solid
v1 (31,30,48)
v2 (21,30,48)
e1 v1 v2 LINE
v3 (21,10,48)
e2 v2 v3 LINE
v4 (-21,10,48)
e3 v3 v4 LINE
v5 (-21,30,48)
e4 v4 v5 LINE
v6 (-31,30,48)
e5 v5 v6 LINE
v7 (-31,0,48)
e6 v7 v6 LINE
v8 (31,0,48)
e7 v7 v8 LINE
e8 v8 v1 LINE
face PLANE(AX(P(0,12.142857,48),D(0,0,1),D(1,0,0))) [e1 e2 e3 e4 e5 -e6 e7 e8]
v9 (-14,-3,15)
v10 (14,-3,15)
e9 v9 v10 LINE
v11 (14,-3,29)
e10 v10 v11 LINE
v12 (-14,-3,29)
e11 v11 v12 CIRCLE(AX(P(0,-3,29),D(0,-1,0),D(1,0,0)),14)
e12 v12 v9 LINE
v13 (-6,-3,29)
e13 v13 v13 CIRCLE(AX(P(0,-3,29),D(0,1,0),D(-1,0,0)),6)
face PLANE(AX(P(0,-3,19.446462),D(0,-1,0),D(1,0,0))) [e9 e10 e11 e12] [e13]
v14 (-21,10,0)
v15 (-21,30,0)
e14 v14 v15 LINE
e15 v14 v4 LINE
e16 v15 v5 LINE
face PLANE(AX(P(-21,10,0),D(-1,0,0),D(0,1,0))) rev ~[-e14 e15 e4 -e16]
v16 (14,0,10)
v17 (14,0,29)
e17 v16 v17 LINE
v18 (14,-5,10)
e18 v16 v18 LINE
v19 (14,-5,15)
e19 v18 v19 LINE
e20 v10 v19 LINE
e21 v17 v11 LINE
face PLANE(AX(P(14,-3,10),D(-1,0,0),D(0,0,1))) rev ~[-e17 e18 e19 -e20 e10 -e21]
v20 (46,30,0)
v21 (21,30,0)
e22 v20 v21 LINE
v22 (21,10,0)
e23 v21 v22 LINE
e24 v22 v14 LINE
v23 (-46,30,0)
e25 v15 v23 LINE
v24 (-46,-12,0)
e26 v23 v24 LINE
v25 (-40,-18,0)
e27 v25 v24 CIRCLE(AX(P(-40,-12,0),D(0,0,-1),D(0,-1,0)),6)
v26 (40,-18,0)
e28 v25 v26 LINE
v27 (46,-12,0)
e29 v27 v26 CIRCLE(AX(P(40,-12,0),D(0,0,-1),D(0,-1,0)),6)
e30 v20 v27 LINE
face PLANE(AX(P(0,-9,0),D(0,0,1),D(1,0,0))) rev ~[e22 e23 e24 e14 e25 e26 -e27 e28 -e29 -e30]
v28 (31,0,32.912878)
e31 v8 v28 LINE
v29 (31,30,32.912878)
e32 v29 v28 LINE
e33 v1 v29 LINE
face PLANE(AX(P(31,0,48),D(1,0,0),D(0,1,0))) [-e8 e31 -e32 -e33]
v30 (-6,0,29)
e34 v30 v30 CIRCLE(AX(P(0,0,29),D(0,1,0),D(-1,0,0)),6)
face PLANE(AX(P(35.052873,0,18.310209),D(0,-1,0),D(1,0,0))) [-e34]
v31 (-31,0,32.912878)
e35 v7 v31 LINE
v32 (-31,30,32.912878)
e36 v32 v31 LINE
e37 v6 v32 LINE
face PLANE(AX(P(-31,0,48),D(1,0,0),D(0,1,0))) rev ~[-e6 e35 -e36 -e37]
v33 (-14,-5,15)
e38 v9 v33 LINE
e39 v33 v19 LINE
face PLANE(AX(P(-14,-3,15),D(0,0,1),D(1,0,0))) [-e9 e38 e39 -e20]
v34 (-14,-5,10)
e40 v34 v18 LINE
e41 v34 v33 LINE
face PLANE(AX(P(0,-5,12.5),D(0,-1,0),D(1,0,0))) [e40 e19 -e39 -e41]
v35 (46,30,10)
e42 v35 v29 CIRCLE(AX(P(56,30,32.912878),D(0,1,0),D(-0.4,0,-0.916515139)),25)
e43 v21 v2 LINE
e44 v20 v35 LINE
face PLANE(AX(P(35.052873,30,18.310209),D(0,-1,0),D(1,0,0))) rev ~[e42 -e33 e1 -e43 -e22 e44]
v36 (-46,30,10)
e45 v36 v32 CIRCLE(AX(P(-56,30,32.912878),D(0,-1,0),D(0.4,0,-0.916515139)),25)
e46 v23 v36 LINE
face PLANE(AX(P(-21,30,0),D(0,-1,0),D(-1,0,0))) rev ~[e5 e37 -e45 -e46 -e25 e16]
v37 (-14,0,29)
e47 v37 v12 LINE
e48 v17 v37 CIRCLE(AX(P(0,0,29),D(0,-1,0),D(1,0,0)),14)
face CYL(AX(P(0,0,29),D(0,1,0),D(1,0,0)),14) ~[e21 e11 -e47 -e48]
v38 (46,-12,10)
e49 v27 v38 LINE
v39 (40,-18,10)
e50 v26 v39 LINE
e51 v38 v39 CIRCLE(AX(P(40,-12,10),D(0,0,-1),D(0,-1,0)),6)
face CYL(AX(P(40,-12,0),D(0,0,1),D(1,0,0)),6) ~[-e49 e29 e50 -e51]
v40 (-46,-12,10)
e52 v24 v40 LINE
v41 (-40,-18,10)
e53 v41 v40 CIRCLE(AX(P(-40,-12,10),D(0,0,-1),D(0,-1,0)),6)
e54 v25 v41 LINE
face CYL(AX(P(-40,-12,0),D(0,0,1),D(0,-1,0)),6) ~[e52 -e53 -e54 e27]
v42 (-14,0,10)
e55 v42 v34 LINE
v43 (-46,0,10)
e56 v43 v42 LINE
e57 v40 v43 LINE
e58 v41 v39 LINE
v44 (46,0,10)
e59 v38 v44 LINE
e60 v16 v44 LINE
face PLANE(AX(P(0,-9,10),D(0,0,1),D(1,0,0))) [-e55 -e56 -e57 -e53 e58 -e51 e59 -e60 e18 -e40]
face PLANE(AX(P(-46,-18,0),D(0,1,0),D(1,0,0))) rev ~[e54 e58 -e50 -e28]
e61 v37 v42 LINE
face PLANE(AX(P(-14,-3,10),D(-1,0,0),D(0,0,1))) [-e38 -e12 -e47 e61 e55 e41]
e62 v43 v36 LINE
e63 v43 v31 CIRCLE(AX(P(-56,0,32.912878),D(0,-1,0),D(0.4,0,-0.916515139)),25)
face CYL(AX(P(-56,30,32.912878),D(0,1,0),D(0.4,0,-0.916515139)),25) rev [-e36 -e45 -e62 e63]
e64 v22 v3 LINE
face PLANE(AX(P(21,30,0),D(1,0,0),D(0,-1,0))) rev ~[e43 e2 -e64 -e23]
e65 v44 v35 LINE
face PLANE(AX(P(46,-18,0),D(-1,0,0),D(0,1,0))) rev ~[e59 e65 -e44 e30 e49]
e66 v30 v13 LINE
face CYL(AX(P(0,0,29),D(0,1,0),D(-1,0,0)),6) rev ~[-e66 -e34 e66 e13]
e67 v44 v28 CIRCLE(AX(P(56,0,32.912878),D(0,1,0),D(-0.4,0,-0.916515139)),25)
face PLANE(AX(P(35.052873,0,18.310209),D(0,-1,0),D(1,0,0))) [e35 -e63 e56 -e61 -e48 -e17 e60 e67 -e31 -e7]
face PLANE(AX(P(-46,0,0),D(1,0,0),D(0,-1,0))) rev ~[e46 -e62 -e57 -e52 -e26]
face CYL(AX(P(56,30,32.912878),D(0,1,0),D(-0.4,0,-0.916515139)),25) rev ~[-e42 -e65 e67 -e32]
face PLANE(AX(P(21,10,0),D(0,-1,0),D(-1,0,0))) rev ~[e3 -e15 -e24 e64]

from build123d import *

# Parameters (mm, degrees)
F0_W        = 15
F0_H        = 30
F1_DEPTH    = 48
F2_DEPTH    = 10
F3_W        = 15
F3_H        = 30
F4_DEPTH    = 38
F5_T1_DEPTH = 30
F7_DEPTH    = 3
F8_W        = 28
F8_H        = 5
F9_DEPTH    = 2
F10_R       = 6


# Not quite as in the source:
# - a fillet or chamfer that OpenCascade refuses, or shapes differently, is made with other operations: its cross-section is extruded or revolved along the edge and cut away or added


with BuildPart() as f1:
    # F0 (on Top) → F1 (new body)
    with BuildSketch(Plane.XY):
        Polygon((21, 10), (0, 10), (-21, 10), (-21, 30), (-31, 30), (-31, 0), (31, 0), (31, 30), (21, 30), align=None)
        with Locations((38.5, 15)):
            Rectangle(F0_W, F0_H)
        with Locations((-38.5, 15)):
            Rectangle(F0_W, F0_H)
    extrude(amount=F1_DEPTH)

    # F0 (on Top) → F2 (join)
    with BuildSketch(Plane.XY):
        Polygon((31, 0), (-31, 0), (-46, 0), (-46, -18), (46, -18), (46, 0), align=None)
    extrude(amount=F2_DEPTH)

    # F3 (on face) → F4 (cut)
    with BuildSketch(Plane.XY.offset(48)):
        with Locations((-38.5, 15)):
            Rectangle(F3_W, F3_H)
        with Locations((38.5, 15)):
            Rectangle(F3_W, F3_H)
    extrude(amount=-F4_DEPTH, mode=Mode.SUBTRACT)

    # F5: fillet of radius 25 on 2 edges, made by hand

    # F5_s2 → F5_t1 (join)
    with BuildSketch(Plane.XZ.offset(-30)):
        with BuildLine():
            ThreePointArc((46, 10), (35.0834993366, 19.2198145372), (31, 32.9128784748))
            Line((31, 32.9128784748), (31, 10))
            Line((31, 10), (46, 10))
        make_face()
        with BuildLine():
            ThreePointArc((-46, 10), (-35.0834993366, 19.2198145372), (-31, 32.9128784748))
            Line((-31, 32.9128784748), (-31, 10))
            Line((-31, 10), (-46, 10))
        make_face()
    extrude(amount=F5_T1_DEPTH)

    # F6 (on face) → F7 (join)
    with BuildSketch(Plane.XZ):
        with BuildLine():
            Line((-14, 29), (-14, 10))
            Line((-14, 10), (14, 10))
            Line((14, 10), (14, 29))
            Line((14, 29), (6, 29))
            ThreePointArc((6, 29), (0, 23), (-6, 29))
            Line((-6, 29), (-14, 29))
        make_face()
        with BuildLine():
            ThreePointArc((14, 29), (0, 43), (-14, 29))
            Line((-14, 29), (-6, 29))
            ThreePointArc((-6, 29), (0, 35), (6, 29))
            Line((6, 29), (14, 29))
        make_face()
    extrude(amount=F7_DEPTH)

    # F8 (on face) → F9 (join)
    with BuildSketch(Plane.XZ.offset(3)):
        with Locations((0, 12.5)):
            Rectangle(F8_W, F8_H)
    extrude(amount=F9_DEPTH)

    # F10
    f10_edges = [f1.edges().sort_by_distance(p)[0] for p in [
        (46, -18, 5),
        (-46, -18, 5),
    ]]
    fillet(f10_edges, radius=F10_R)


solid = f1.part
